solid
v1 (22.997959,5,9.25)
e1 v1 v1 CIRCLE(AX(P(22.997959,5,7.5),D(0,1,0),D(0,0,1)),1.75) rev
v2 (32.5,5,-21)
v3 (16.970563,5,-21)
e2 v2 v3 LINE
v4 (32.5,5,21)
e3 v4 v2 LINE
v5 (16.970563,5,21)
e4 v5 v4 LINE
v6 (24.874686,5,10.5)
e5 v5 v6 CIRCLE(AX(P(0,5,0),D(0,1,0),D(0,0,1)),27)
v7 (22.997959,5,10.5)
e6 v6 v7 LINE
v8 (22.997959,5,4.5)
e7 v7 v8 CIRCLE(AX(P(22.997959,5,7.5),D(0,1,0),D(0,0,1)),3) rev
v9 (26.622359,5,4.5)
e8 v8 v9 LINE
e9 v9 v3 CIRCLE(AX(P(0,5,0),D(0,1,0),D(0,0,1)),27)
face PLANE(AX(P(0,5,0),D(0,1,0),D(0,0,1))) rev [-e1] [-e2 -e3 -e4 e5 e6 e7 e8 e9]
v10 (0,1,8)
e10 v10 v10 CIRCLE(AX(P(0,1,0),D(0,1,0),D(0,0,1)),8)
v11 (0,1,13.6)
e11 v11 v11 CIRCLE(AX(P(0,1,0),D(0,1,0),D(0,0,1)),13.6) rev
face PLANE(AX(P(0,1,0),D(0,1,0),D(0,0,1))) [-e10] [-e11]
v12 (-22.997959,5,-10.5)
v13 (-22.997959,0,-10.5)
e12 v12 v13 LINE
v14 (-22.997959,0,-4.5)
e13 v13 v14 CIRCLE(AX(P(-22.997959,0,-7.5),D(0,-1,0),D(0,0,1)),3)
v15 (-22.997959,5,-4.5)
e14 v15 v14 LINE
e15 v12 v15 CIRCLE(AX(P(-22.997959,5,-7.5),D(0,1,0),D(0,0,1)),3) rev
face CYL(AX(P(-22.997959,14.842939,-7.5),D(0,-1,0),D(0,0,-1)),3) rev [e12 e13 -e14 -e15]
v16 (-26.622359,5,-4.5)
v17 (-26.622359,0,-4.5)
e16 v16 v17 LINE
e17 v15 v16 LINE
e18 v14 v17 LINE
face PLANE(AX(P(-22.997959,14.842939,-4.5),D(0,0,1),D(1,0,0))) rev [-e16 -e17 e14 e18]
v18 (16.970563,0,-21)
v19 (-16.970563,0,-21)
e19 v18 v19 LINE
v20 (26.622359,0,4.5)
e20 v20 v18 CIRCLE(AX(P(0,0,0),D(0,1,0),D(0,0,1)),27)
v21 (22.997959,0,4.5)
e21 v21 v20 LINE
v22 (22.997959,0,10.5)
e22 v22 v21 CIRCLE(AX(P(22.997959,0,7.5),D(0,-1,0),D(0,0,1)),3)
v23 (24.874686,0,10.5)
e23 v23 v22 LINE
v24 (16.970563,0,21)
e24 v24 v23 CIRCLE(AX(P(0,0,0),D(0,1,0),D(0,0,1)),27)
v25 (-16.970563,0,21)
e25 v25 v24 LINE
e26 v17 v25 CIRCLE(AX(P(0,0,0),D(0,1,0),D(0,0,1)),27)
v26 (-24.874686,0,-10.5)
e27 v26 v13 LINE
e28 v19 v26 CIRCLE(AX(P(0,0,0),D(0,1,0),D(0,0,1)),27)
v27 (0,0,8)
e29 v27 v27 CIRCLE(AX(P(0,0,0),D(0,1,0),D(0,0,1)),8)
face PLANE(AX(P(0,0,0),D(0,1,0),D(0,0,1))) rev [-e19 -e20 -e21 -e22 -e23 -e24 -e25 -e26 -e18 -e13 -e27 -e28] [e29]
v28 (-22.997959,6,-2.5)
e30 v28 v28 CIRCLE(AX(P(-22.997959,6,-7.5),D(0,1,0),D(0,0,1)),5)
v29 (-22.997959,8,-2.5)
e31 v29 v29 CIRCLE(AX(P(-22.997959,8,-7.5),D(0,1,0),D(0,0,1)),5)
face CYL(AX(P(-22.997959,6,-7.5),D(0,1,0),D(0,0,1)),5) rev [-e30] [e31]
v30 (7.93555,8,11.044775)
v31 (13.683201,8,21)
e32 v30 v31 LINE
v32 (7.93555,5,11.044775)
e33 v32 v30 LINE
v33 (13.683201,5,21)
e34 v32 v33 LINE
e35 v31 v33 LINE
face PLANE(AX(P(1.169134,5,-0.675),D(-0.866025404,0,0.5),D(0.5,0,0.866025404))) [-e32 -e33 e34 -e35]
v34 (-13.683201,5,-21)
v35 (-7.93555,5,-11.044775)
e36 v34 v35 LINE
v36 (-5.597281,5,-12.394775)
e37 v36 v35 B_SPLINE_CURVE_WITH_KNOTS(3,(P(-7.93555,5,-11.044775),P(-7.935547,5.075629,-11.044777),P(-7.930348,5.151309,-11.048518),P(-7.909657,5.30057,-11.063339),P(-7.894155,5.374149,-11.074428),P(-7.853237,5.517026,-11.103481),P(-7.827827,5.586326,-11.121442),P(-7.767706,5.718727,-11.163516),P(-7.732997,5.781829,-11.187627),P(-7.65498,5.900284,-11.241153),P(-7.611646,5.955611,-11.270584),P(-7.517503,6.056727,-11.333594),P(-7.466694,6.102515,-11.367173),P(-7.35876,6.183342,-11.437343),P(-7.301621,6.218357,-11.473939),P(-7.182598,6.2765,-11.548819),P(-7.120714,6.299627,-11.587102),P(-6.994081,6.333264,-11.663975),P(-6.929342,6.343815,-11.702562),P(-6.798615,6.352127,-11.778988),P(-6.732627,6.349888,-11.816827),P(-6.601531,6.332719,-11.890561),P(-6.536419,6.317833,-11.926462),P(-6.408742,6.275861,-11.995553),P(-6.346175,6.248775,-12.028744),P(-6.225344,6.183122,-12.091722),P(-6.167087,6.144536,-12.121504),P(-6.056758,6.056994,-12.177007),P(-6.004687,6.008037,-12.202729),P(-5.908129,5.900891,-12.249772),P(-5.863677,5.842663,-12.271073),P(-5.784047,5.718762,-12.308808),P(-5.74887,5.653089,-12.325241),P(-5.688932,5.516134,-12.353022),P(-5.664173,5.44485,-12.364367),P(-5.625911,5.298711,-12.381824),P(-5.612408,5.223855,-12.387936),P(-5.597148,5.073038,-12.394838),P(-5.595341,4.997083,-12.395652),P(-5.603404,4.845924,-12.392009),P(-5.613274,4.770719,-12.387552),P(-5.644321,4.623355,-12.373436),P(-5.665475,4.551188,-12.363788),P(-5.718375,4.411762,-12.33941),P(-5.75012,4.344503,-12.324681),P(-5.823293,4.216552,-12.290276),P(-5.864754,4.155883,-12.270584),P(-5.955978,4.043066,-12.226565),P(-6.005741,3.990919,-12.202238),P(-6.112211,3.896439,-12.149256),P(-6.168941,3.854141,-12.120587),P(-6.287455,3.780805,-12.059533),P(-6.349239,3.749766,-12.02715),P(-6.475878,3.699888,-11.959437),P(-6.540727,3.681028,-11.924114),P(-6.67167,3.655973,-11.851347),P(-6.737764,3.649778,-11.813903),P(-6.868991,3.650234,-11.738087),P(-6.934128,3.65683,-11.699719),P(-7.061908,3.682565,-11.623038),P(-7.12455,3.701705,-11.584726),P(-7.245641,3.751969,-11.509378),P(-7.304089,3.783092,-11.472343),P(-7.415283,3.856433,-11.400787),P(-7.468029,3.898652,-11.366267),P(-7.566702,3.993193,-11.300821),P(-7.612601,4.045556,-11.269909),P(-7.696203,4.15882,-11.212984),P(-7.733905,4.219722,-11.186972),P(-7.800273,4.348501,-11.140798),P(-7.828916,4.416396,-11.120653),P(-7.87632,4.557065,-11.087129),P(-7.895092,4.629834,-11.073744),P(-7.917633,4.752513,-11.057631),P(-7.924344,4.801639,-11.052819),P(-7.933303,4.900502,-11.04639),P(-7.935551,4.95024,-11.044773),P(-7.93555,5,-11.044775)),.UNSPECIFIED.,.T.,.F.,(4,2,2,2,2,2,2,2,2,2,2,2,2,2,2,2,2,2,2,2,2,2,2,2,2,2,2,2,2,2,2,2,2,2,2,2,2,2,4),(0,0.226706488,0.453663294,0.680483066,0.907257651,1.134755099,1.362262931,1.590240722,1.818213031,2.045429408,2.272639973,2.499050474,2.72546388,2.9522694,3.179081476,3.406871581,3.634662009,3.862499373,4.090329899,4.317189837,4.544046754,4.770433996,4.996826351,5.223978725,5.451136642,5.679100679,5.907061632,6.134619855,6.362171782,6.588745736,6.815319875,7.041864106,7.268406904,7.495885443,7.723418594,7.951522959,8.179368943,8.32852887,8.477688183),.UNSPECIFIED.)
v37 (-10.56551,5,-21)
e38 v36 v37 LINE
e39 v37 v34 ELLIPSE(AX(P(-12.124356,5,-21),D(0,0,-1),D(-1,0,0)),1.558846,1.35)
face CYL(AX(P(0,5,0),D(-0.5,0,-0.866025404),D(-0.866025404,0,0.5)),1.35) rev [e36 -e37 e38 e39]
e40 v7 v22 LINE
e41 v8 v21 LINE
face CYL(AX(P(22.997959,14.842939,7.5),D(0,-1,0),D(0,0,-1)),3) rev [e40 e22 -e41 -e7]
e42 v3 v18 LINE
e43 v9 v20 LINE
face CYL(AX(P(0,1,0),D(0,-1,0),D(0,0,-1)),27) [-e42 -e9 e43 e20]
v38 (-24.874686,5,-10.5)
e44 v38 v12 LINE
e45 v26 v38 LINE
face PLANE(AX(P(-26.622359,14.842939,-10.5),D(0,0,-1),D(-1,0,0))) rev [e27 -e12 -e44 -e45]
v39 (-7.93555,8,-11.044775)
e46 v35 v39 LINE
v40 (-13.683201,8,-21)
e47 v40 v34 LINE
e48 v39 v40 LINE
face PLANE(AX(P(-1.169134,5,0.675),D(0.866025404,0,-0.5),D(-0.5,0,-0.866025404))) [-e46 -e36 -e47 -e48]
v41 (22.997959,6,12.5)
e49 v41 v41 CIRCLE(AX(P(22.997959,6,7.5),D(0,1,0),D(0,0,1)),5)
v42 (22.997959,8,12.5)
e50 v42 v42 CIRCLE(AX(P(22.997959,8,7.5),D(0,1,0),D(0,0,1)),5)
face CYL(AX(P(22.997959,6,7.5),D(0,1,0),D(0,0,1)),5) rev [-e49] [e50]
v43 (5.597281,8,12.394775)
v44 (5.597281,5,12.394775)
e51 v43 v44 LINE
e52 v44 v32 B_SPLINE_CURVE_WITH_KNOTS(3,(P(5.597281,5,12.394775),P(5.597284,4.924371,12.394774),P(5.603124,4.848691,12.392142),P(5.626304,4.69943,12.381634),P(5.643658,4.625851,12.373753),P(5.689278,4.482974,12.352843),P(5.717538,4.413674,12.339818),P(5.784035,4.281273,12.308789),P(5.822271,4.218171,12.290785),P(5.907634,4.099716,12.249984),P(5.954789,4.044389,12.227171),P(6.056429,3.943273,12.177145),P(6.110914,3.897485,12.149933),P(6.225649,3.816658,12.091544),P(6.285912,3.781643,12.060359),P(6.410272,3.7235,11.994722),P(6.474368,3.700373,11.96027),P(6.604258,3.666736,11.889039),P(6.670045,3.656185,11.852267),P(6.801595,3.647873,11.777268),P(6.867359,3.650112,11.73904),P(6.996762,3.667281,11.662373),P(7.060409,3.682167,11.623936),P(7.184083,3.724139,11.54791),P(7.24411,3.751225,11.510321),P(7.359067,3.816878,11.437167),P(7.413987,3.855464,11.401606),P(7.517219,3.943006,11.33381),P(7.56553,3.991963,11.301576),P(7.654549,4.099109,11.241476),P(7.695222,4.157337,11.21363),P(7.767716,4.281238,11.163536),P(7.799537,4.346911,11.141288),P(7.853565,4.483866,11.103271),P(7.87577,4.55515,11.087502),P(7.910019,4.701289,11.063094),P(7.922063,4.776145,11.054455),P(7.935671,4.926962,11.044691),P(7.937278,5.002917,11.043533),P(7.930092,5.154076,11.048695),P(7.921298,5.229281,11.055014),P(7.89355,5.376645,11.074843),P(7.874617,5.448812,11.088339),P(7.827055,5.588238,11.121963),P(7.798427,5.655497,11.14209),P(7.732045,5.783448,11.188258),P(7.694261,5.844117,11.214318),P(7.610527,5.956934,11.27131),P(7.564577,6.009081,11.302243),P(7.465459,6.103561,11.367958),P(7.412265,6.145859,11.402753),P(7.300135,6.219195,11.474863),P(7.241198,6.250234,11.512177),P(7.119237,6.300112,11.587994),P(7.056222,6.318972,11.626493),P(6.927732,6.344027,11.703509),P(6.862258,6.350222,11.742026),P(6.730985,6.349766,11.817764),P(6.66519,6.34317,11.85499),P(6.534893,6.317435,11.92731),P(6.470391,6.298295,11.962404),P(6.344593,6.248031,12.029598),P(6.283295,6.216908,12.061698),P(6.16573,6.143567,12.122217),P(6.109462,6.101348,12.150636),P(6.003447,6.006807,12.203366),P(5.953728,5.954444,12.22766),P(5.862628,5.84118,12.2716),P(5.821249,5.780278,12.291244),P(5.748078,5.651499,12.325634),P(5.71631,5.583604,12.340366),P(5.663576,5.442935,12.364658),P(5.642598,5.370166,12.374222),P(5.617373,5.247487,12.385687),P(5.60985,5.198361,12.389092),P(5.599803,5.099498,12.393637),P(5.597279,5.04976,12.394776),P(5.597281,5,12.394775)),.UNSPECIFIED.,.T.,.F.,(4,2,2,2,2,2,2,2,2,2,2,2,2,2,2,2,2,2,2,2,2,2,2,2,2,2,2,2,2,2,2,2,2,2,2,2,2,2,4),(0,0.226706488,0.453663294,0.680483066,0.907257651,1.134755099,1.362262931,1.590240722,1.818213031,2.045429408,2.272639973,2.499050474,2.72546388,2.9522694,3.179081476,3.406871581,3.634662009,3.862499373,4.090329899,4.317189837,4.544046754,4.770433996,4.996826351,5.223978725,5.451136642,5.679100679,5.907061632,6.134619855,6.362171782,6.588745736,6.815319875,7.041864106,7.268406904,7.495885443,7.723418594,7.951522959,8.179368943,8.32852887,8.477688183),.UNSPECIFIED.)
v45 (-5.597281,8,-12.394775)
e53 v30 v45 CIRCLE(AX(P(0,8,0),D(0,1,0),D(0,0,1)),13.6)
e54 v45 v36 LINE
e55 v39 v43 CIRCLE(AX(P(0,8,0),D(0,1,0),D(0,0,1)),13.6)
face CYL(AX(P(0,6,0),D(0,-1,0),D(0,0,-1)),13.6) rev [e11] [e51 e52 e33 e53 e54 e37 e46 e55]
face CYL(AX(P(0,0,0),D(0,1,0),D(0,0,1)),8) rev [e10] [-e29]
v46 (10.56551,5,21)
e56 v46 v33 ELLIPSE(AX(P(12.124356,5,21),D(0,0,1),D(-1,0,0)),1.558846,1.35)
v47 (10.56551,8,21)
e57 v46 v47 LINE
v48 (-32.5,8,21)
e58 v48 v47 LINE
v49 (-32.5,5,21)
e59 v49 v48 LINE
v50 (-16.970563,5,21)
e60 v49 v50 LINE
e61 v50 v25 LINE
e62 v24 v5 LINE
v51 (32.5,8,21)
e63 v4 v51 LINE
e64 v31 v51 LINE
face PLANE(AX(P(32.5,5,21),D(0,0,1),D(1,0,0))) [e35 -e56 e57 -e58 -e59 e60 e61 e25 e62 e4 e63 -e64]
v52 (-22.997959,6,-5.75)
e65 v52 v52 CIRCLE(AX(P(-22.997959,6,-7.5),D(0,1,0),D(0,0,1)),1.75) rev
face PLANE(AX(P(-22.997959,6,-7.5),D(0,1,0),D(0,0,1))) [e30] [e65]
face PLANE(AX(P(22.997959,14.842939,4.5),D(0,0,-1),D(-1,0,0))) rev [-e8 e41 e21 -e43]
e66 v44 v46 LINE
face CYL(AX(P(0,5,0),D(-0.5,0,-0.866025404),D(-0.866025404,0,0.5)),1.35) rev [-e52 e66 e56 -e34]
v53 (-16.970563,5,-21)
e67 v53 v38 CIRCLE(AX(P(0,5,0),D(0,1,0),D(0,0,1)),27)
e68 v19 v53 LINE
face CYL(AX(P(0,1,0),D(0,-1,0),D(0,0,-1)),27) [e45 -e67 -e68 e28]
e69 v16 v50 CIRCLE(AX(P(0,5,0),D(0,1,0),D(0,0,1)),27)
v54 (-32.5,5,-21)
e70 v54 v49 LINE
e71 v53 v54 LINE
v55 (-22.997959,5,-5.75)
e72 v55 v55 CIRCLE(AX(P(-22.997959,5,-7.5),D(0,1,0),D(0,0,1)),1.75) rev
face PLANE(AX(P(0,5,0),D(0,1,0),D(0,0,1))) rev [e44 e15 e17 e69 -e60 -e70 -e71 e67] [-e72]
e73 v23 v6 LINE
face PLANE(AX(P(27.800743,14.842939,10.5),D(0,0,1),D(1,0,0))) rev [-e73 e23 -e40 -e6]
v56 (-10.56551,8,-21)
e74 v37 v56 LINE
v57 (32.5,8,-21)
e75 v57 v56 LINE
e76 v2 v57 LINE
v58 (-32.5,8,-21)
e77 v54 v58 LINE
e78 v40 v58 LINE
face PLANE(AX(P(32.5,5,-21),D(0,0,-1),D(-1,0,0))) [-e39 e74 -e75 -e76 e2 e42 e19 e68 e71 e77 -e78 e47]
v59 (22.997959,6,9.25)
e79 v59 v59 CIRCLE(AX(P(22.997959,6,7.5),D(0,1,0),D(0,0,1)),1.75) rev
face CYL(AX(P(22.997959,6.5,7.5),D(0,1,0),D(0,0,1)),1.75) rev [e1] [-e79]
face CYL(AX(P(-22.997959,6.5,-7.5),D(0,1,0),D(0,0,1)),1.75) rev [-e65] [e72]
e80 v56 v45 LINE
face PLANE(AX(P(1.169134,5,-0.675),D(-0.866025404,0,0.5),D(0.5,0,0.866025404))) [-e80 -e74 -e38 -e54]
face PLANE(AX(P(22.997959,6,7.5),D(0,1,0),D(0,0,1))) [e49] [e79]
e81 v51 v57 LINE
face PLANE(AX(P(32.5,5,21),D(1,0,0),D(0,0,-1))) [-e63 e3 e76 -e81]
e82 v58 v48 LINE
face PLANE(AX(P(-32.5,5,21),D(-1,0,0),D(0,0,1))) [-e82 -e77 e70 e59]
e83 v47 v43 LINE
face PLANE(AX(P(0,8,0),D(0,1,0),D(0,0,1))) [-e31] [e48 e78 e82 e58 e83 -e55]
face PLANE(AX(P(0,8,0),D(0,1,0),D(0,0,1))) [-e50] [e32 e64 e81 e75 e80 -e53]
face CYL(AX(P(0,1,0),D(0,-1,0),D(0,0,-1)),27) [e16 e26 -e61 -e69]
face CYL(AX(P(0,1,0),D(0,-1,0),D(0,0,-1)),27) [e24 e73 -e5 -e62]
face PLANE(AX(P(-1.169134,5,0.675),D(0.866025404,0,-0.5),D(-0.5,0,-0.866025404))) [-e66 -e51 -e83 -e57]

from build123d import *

# Parameters (mm, degrees)
SCHIZZO1_R                        = 27
ESTRUSIONE_ESTRUSIONE1_DEPTH      = 1
SCHIZZO2_R                        = 8
TAGLIO_ESTRUSIONE1_DEPTH          = 39.19685851
SCHIZZO3_R                        = 27
SCHIZZO3_R_2                      = 13.6
ESTRUSIONE_ESTRUSIONE2_DEPTH      = 5
ESTRUSIONE_ESTRUSIONE3_DEPTH      = 2
ESTRUSIONE_ESTRUSIONE3_DEPTH_BACK = 1
SCHIZZO5_W                        = 65
SCHIZZO5_H                        = 42
SCHIZZO5_R                        = 13.6
TAGLIO_ESTRUSIONE2_START          = -27
TAGLIO_ESTRUSIONE2_OUTLINE_R      = 1.35
TAGLIO_ESTRUSIONE2_DEPTH          = 53.999999754
TAGLIO_ESTRUSIONE3_DEPTH          = 44.869308585
TAGLIO_ESTRUSIONE3_DEPTH_BACK     = 44.869308585
SCHIZZO8_W                        = 81.46070362
SCHIZZO8_H                        = 59.010327036
SCHIZZO8_W_2                      = 65
SCHIZZO8_H_2                      = 42
TAGLIO_ESTRUSIONE5_DEPTH          = 43.676105804
TAGLIO_ESTRUSIONE6_DEPTH          = 5
SCHIZZO13_R                       = 5
TAGLIO_ESTRUSIONE8_DEPTH          = 2
TAGLIO_ESTRUSIONE9_DEPTH          = 63.725779509
TAGLIO_ESTRUSIONE9_DEPTH_BACK     = 63.725779509
SCHIZZO3D3_R                      = 1.75


# Read off the part's stored shape, not the designer's step: Taglio-Estrusione2
with BuildPart() as part:
    # Schizzo1 → Estrusione-Estrusione1 (new body)
    with BuildSketch(Plane(origin=(0, 0, 0), x_dir=(1, 0, 0), z_dir=(0, 1, 0))):
        with Locations(Location((0, 0, 0), (0, 0, 270))):
            Circle(SCHIZZO1_R)
    extrude(amount=ESTRUSIONE_ESTRUSIONE1_DEPTH)

    # Schizzo2 → Taglio-Estrusione1 (cut, through all)
    with BuildSketch(Plane(origin=(0, 1, 0), x_dir=(1, 0, 0), z_dir=(0, 1, 0))):
        with Locations(Location((0, 0, 0), (0, 0, 270))):
            Circle(SCHIZZO2_R)
    extrude(amount=-TAGLIO_ESTRUSIONE1_DEPTH, mode=Mode.SUBTRACT)

    # Schizzo3 → Estrusione-Estrusione2 (add)
    with BuildSketch(Plane(origin=(0, 1, 0), x_dir=(1, 0, 0), z_dir=(0, 1, 0))):
        with Locations(Location((0, 0, 0), (0, 0, 270))):
            Circle(SCHIZZO3_R)
        with Locations(Location((0, 0, 0), (0, 0, 270))):
            Circle(SCHIZZO3_R_2, mode=Mode.SUBTRACT)
    extrude(amount=ESTRUSIONE_ESTRUSIONE2_DEPTH)

    # Schizzo5 → Estrusione-Estrusione3 (add, two sides: drawn at the far end of the back side and taken through both)
    with BuildSketch(Plane(origin=(0, 6, 0), x_dir=(1, 0, 0), z_dir=(0, 1, 0)).offset(-ESTRUSIONE_ESTRUSIONE3_DEPTH_BACK)):
        Rectangle(SCHIZZO5_W, SCHIZZO5_H)
        with Locations(Location((0, 0, 0), (0, 0, 270))):
            Circle(SCHIZZO5_R, mode=Mode.SUBTRACT)
    extrude(amount=ESTRUSIONE_ESTRUSIONE3_DEPTH + ESTRUSIONE_ESTRUSIONE3_DEPTH_BACK)

    # Taglio-Estrusione2 outline → Taglio-Estrusione2 (cut)
    with BuildSketch(Plane(origin=(0, 0, 0), x_dir=(0.866025403784438, 0, -0.500000000000001), z_dir=(0.500000000000001, 0, 0.866025403784438)).offset(TAGLIO_ESTRUSIONE2_START)):
        with Locations((0, 5)):
            Circle(TAGLIO_ESTRUSIONE2_OUTLINE_R)
    extrude(amount=TAGLIO_ESTRUSIONE2_DEPTH, mode=Mode.SUBTRACT)

    # Schizzo3D2 → Taglio-Estrusione3 (cut, two sides: drawn at the far end of the back side and taken through both)
    with BuildSketch(Plane(origin=(1.169134295, 5, -0.675), x_dir=(-0.41149103074101084, 0.8799053976571924, 0.23757445736745078), z_dir=(-0.5000000000000011, 1.0747888534457561e-14, -0.866025403784438)).offset(-TAGLIO_ESTRUSIONE3_DEPTH_BACK)):
        Polygon((0, 0), (1.28290207, -2.375744574), (5.682429058, 0), (4.399526988, 2.375744574), align=None)
    extrude(amount=TAGLIO_ESTRUSIONE3_DEPTH + TAGLIO_ESTRUSIONE3_DEPTH_BACK, mode=Mode.SUBTRACT)

    # Schizzo8 → Taglio-Estrusione5 (cut, through all)
    with BuildSketch(Plane(origin=(0, 6, 0), x_dir=(1, 0, 0), z_dir=(0, 1, 0))):
        Rectangle(SCHIZZO8_W, SCHIZZO8_H)
        Rectangle(SCHIZZO8_W_2, SCHIZZO8_H_2, mode=Mode.SUBTRACT)
    extrude(amount=-TAGLIO_ESTRUSIONE5_DEPTH, mode=Mode.SUBTRACT)

    # Schizzo9 → Taglio-Estrusione6 (cut)
    with BuildSketch(Plane.XZ):
        with BuildLine():
            Line((-22.997958605, -4.5), (-26.622359024, -4.5))
            Line((-26.622359024, -4.5), (-26.622359024, -10.5))
            Line((-26.622359024, -10.5), (-22.997958605, -10.5))
            ThreePointArc((-22.997958605, -10.5), (-19.997958605, -7.5), (-22.997958605, -4.5))
        make_face()
        with BuildLine():
            Line((22.997958605, 4.5), (27.800743069, 4.5))
            Line((27.800743069, 4.5), (27.800743069, 10.5))
            Line((27.800743069, 10.5), (22.997958605, 10.5))
            ThreePointArc((22.997958605, 10.5), (19.997958605, 7.5), (22.997958605, 4.5))
        make_face()
    extrude(amount=-TAGLIO_ESTRUSIONE6_DEPTH, mode=Mode.SUBTRACT)

    # Schizzo13 → Taglio-Estrusione8 (cut)
    with BuildSketch(Plane(origin=(0, 8, 0), x_dir=(1, 0, 0), z_dir=(0, 1, 0))):
        with Locations(Location((-22.997958605, 7.5, 0), (0, 0, 270))):
            Circle(SCHIZZO13_R)
        with Locations(Location((22.997958605, -7.5, 0), (0, 0, 270))):
            Circle(SCHIZZO13_R)
    extrude(amount=-TAGLIO_ESTRUSIONE8_DEPTH, mode=Mode.SUBTRACT)

    # Schizzo3D3 → Taglio-Estrusione9 (cut, two sides: drawn at the far end of the back side and taken through both)
    with BuildSketch(Plane(origin=(-22.997958605, 6.5, -7.5), x_dir=(0.9507217281959008, 0, 0.3100454733360893), z_dir=(0, -1, 0)).offset(-TAGLIO_ESTRUSIONE9_DEPTH_BACK)):
        with Locations(Location((0, 0, 0), (0, 0, 71.938029054))):
            Circle(SCHIZZO3D3_R)
        with Locations(Location((48.38, 0, 0), (0, 0, 71.938029054))):
            Circle(SCHIZZO3D3_R)
    extrude(amount=TAGLIO_ESTRUSIONE9_DEPTH + TAGLIO_ESTRUSIONE9_DEPTH_BACK, mode=Mode.SUBTRACT)


solid = part.part
